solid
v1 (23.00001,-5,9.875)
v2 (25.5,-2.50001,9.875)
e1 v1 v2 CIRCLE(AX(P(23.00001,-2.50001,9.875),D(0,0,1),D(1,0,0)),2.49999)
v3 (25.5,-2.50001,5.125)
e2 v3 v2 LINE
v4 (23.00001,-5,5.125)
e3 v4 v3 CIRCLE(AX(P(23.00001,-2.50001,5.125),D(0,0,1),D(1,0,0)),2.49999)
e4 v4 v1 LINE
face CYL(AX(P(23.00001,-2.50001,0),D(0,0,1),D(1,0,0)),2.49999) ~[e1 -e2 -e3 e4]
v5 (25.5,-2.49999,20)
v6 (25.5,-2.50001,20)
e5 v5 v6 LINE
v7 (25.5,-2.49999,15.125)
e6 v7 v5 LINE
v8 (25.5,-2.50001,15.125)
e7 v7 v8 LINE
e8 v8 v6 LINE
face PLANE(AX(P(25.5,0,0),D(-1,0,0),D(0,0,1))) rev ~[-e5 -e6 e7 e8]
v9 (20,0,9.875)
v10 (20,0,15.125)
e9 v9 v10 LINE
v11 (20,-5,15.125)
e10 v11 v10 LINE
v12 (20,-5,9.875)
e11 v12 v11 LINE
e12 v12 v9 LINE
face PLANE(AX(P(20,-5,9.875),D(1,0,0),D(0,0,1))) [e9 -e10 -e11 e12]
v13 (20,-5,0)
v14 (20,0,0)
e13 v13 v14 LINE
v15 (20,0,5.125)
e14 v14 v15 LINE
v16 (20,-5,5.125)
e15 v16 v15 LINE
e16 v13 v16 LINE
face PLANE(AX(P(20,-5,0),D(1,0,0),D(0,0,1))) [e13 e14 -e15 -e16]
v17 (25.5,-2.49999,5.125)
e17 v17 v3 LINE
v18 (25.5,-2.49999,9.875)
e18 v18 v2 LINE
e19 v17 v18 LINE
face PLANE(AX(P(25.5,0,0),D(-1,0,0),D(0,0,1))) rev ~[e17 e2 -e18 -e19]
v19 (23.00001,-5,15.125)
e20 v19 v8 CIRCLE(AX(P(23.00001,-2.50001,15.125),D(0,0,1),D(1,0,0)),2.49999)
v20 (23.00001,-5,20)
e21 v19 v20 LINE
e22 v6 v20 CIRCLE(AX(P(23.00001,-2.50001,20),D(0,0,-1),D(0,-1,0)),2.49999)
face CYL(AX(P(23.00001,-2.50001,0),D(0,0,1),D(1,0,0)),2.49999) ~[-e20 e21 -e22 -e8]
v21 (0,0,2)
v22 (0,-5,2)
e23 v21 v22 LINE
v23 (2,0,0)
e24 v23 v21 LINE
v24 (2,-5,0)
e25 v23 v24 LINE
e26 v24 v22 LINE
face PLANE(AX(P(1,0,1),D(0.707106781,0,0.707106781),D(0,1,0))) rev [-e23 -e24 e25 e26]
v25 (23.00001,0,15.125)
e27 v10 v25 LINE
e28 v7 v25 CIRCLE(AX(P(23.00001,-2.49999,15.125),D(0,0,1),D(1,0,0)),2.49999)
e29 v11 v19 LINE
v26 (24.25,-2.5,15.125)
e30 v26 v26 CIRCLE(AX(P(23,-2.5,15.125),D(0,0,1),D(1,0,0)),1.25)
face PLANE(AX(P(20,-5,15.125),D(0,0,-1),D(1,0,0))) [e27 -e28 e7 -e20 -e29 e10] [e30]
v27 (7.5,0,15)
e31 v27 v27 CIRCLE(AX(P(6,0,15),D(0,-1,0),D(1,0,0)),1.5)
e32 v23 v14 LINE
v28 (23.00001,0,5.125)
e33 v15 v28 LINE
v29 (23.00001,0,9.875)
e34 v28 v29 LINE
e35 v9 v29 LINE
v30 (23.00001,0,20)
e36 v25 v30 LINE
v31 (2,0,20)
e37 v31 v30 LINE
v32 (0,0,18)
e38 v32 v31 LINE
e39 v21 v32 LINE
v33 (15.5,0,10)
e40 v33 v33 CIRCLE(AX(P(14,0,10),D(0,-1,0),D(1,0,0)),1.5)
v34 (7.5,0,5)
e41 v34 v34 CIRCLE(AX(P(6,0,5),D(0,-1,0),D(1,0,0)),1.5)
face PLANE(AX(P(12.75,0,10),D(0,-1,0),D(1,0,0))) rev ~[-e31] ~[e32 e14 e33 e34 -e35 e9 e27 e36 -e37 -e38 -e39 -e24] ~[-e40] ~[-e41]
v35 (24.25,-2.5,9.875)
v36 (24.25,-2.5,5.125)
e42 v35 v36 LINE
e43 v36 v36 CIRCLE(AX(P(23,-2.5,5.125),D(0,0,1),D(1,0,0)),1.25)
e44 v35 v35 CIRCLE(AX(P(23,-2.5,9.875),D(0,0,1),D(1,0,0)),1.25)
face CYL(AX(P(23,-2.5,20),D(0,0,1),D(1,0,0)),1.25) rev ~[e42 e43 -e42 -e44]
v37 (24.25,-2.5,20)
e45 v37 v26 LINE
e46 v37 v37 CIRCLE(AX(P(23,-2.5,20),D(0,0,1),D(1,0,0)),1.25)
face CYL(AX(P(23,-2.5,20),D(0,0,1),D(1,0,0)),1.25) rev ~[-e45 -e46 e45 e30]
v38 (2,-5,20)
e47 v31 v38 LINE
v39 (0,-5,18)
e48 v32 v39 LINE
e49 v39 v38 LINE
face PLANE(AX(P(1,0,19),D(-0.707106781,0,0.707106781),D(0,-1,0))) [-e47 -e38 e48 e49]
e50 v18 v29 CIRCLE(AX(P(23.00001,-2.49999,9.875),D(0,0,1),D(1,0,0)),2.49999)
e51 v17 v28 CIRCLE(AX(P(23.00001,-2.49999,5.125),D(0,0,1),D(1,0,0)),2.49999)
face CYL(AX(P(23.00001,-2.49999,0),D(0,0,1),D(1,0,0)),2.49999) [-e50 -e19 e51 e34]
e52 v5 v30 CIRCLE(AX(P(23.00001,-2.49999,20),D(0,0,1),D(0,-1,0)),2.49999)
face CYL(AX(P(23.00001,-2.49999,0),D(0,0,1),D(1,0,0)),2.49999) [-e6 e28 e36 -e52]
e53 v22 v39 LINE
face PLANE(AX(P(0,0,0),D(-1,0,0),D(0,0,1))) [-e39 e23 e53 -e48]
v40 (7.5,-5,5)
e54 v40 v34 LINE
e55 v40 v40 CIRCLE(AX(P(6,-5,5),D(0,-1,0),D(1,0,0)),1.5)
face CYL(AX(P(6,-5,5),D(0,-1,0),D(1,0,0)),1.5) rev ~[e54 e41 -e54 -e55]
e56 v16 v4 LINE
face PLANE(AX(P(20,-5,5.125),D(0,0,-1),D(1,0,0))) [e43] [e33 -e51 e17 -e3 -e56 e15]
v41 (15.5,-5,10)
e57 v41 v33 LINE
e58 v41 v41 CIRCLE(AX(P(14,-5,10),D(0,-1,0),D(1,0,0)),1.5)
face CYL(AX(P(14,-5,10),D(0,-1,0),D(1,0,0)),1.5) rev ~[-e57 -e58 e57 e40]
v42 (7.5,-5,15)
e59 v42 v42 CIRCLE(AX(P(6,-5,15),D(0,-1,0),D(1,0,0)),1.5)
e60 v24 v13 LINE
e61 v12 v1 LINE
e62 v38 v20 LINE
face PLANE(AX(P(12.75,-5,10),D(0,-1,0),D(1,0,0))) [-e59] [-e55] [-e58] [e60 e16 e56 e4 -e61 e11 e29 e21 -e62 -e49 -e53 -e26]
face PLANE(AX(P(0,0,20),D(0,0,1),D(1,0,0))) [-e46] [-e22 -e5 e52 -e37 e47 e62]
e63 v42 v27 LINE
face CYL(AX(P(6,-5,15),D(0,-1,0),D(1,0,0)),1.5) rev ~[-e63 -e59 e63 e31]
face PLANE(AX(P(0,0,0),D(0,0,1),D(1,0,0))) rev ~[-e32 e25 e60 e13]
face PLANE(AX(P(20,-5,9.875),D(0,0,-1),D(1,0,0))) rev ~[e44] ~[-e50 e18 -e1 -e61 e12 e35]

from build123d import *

# Parameters (mm, degrees)
F0_W     = 25.5
F0_H     = 20
F1_DEPTH = 5
F2_R     = 2.49999
F3_R     = 1.25
F4_DEPTH = 25
F5_W     = 9.4863112453
F5_H     = 5.25
F5_W_2   = 9.3420613807
F5_H_2   = 5.125
F6_DEPTH = 5.001
F7_R     = 1.5
F8_DEPTH = 25
F9_SIZE  = 2


# Not quite as in the source:
# - a fillet or chamfer is up to 0.001 mm smaller than in the source, because OpenCascade refuses the exact size


with BuildPart() as f1:
    # F0 (on Front) → F1 (new body)
    with BuildSketch(Plane.XZ):
        with Locations((12.75, 10)):
            Rectangle(F0_W, F0_H)
    extrude(amount=F1_DEPTH)

    # F2 (radius 2.5 in the source; OpenCascade refuses exactly that, so slightly less here)
    f2_edges = [f1.edges().sort_by_distance(p)[0] for p in [
        (25.5, -5, 10),
        (25.5, 0, 10),
    ]]
    fillet(f2_edges, radius=F2_R)

    # F3 (on face) → F4 (cut)
    with BuildSketch(Plane.XY.offset(20)):
        with Locations((23, -2.5)):
            Circle(F3_R)
    extrude(amount=-F4_DEPTH, mode=Mode.SUBTRACT)

    # F5 (on face) → F6 (cut, through all)
    with BuildSketch(Plane.XZ.offset(5)):
        with Locations((24.7431556227, 12.5)):
            Rectangle(F5_W, F5_H)
        with Locations((24.6710306904, 2.5625)):
            Rectangle(F5_W_2, F5_H_2)
    extrude(amount=-F6_DEPTH, mode=Mode.SUBTRACT)

    # F7 (on face) → F8 (cut)
    with BuildSketch(Plane.XZ.offset(5)):
        with Locations((14, 10)):
            Circle(F7_R)
        with Locations((6, 15)):
            Circle(F7_R)
        with Locations((6, 5)):
            Circle(F7_R)
    extrude(amount=-F8_DEPTH, mode=Mode.SUBTRACT)

    # F9
    f9_edges = [f1.edges().sort_by_distance(p)[0] for p in [
        (0, -2.5, 20),
        (0, -2.5, 0),
    ]]
    chamfer(f9_edges, length=F9_SIZE)


solid = f1.part
